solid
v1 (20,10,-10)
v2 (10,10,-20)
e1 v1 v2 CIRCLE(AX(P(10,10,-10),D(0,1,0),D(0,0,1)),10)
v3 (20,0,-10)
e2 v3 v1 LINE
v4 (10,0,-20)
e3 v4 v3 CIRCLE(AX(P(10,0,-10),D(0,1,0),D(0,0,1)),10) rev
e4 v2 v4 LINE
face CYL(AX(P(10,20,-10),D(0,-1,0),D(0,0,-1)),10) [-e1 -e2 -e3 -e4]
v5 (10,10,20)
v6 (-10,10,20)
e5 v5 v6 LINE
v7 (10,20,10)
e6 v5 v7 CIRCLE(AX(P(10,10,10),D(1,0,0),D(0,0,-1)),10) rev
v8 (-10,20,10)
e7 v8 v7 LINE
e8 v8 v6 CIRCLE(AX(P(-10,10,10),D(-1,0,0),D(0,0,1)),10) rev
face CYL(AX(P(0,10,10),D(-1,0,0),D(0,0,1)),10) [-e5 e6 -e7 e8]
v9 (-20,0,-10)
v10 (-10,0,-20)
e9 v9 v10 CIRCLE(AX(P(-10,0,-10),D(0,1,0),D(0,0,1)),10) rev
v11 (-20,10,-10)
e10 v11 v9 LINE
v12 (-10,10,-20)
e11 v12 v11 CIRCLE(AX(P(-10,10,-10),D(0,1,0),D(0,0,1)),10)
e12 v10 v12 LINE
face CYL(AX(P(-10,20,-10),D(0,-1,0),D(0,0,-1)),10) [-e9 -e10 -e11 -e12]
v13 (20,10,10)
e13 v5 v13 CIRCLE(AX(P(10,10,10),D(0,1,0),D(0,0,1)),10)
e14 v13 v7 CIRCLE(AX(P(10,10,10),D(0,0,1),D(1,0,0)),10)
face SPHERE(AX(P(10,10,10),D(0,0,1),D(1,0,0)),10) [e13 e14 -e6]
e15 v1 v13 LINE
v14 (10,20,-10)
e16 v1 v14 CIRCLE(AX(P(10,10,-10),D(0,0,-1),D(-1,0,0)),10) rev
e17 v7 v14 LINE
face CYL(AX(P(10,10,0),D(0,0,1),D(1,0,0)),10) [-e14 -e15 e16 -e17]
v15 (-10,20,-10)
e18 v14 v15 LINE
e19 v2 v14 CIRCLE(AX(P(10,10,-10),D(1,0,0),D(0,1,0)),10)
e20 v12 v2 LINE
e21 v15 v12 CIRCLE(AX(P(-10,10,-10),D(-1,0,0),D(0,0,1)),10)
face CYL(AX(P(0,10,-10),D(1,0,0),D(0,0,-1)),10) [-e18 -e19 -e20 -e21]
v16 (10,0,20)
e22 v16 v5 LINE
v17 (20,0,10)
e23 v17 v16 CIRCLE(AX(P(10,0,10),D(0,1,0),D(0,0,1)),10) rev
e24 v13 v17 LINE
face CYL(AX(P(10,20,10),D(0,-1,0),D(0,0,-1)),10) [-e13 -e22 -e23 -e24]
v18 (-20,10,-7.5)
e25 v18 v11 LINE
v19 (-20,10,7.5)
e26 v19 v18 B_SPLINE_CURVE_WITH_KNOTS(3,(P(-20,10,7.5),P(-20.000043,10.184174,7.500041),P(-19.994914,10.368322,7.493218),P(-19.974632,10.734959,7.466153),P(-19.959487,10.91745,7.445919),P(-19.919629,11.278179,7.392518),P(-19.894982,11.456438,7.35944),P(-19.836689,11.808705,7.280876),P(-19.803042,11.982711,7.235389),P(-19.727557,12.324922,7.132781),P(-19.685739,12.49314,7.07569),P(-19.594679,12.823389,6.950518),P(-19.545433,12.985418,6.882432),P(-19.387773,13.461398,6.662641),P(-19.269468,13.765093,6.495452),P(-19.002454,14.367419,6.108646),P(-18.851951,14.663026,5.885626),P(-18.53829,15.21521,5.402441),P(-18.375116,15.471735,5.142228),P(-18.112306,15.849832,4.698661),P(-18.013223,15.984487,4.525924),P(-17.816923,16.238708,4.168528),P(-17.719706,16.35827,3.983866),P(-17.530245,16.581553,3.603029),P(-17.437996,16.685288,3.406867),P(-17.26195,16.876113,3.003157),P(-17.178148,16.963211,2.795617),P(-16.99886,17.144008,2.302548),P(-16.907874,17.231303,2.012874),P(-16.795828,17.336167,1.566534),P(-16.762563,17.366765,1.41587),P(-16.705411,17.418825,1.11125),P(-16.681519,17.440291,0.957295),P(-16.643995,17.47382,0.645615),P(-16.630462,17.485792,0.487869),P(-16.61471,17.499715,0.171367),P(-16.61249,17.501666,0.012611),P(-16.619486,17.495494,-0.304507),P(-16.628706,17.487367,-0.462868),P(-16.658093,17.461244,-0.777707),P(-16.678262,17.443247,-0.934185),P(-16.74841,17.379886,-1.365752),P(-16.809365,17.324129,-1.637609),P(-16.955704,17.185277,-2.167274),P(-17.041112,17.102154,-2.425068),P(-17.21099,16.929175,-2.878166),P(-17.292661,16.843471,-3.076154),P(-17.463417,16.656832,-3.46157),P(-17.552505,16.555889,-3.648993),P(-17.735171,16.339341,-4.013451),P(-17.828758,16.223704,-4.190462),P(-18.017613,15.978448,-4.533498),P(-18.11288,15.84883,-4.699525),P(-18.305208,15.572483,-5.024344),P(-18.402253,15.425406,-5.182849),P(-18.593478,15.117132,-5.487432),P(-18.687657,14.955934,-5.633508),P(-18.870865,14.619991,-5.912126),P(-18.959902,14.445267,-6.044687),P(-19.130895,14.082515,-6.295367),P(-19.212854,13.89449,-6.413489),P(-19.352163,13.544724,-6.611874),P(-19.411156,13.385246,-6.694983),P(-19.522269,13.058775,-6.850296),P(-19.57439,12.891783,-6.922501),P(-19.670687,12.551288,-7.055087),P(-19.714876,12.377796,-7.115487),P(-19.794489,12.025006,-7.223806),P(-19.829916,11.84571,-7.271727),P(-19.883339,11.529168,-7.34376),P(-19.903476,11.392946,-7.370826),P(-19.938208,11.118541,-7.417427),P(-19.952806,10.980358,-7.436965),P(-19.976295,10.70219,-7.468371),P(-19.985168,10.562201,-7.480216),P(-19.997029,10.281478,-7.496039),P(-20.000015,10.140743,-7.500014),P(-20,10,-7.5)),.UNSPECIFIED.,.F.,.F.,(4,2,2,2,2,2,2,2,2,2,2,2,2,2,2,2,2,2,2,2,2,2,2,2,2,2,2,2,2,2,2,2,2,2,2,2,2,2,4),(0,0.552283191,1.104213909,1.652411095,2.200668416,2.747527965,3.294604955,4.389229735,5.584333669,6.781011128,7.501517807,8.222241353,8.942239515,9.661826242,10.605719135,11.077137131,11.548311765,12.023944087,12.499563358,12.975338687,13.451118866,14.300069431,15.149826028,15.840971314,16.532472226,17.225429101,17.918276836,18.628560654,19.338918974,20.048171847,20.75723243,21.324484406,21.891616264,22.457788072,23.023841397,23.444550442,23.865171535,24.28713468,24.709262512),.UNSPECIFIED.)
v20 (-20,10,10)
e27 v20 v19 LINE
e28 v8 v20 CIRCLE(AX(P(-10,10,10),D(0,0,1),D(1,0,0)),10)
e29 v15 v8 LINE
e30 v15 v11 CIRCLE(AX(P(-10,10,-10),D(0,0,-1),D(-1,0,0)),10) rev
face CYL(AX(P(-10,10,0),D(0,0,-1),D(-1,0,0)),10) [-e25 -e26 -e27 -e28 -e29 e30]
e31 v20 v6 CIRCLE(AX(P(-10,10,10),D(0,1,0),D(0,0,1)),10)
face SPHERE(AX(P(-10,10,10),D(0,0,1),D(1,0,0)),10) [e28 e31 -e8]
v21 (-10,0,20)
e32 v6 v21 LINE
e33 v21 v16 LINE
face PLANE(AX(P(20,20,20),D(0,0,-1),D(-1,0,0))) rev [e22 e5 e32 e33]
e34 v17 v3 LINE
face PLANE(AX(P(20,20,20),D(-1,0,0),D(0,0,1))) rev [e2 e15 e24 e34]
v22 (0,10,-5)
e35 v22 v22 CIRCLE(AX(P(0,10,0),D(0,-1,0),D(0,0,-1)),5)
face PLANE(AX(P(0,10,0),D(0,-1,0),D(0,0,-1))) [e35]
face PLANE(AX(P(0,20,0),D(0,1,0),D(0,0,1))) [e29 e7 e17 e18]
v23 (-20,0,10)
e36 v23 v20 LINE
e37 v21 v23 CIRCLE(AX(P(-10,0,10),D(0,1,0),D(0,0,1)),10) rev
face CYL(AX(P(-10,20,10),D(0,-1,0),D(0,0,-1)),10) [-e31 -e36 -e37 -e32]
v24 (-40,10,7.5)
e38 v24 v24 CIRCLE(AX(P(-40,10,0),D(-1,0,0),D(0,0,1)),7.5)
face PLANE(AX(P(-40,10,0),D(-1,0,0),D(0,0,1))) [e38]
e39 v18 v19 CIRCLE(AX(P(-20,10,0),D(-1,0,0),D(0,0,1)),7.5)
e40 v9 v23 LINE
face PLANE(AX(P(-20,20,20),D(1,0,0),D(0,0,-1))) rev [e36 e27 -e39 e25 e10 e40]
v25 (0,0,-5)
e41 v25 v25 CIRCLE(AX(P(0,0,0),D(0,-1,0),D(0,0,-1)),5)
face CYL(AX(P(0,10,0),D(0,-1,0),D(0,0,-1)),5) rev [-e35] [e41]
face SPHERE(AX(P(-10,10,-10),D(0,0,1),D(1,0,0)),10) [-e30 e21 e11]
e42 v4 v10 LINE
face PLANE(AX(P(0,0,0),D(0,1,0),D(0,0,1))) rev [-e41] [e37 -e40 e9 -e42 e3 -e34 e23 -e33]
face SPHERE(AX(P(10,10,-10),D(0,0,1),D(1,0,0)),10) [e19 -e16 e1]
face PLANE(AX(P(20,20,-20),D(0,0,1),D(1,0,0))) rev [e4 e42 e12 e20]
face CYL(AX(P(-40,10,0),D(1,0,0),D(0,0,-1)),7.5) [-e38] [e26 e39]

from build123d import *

# Parameters (mm, degrees)
SKETCH1_W           = 40
SKETCH1_H           = 40
BOSS_EXTRUDE1_DEPTH = 20
SKETCH2_R           = 5
CUT_EXTRUDE1_DEPTH  = 10
SKETCH3_R           = 7.5
BOSS_EXTRUDE2_DEPTH = 20
FILLET1_R           = 10


with BuildPart() as part:
    # Sketch1 → Boss-Extrude1 (new body)
    with BuildSketch(Plane(origin=(0, 0, 0), x_dir=(1, 0, 0), z_dir=(0, 1, 0))):
        Rectangle(SKETCH1_W, SKETCH1_H)
    extrude(amount=BOSS_EXTRUDE1_DEPTH)

    # Sketch2 → Cut-Extrude1 (cut)
    with BuildSketch(Plane.XZ):
        with Locations(Location((0, 0, 0), (0, 0, 270))):
            Circle(SKETCH2_R)
    extrude(amount=-CUT_EXTRUDE1_DEPTH, mode=Mode.SUBTRACT)

    # Sketch3 → Boss-Extrude2 (add)
    with BuildSketch(Plane.ZY.offset(20)):
        with Locations((0, 10)):
            Circle(SKETCH3_R)
    extrude(amount=BOSS_EXTRUDE2_DEPTH)

    # Fillet1
    # the kernel refuses this fillet: 10 mm, written as the material it takes off along each edge
    with BuildSketch(Plane(origin=(10, 10, -10), x_dir=(0, 1, 0), z_dir=(1, 0, 0))) as fillet1_piece_1_section:
        Polygon((0, 0), (FILLET1_R, 0), (FILLET1_R, -FILLET1_R), (0, -FILLET1_R), align=None)
    fillet1_piece_1 = extrude(amount=FILLET1_R, mode=Mode.PRIVATE)
    fillet1_piece_1 = fillet1_piece_1 - Plane(origin=(10, 10, -10), x_dir=(0, -0.7071067811865475, 0.7071067811865475), z_dir=(1, 0, 0)) * Sphere(FILLET1_R, mode=Mode.PRIVATE)
    add(fillet1_piece_1, mode=Mode.SUBTRACT)
    with BuildSketch(Plane(origin=(10, 10, 10), x_dir=(1, 0, 0), z_dir=(0, 0, 1))) as fillet1_piece_2_section:
        Polygon((0, 0), (FILLET1_R, 0), (FILLET1_R, FILLET1_R), (0, FILLET1_R), align=None)
    fillet1_piece_2 = extrude(amount=FILLET1_R, mode=Mode.PRIVATE)
    fillet1_piece_2 = fillet1_piece_2 - Plane(origin=(10, 10, 10), x_dir=(-0.7071067811865475, -0.7071067811865475, 0), z_dir=(0, 0, 1)) * Sphere(FILLET1_R, mode=Mode.PRIVATE)
    add(fillet1_piece_2, mode=Mode.SUBTRACT)
    with BuildSketch(Plane(origin=(-10, 10, -10), x_dir=(0, 1, 0), z_dir=(-1, 0, 0))) as fillet1_piece_3_section:
        Polygon((0, 0), (FILLET1_R, 0), (FILLET1_R, FILLET1_R), (0, FILLET1_R), align=None)
    fillet1_piece_3 = extrude(amount=FILLET1_R, mode=Mode.PRIVATE)
    fillet1_piece_3 = fillet1_piece_3 - Plane(origin=(-10, 10, -10), x_dir=(0, -0.7071067811865475, 0.7071067811865475), z_dir=(-1, 0, 0)) * Sphere(FILLET1_R, mode=Mode.PRIVATE)
    add(fillet1_piece_3, mode=Mode.SUBTRACT)
    with BuildSketch(Plane(origin=(-10, 10, 10), x_dir=(-1, 0, 0), z_dir=(0, 0, 1))) as fillet1_piece_4_section:
        Polygon((0, 0), (FILLET1_R, 0), (FILLET1_R, -FILLET1_R), (0, -FILLET1_R), align=None)
    fillet1_piece_4 = extrude(amount=FILLET1_R, mode=Mode.PRIVATE)
    fillet1_piece_4 = fillet1_piece_4 - Plane(origin=(-10, 10, 10), x_dir=(0.7071067811865475, -0.7071067811865475, 0), z_dir=(0, 0, 1)) * Sphere(FILLET1_R, mode=Mode.PRIVATE)
    add(fillet1_piece_4, mode=Mode.SUBTRACT)
    with BuildSketch(Plane(origin=(20, 20, -10), x_dir=(0, -1, 0), z_dir=(0, 0, 1)), Plane(origin=(10, 20, 20), x_dir=(0, -1, 0), z_dir=(-1, 0, 0))) as fillet1_piece_5:
        with BuildLine():
            CenterArc((FILLET1_R, -FILLET1_R), FILLET1_R, 90, 90)
            Line((0, -FILLET1_R), (0, 0))
            Line((0, 0), (FILLET1_R, 0))
        make_face()
    extrude(amount=20, mode=Mode.SUBTRACT)
    with BuildSketch(Plane(origin=(-10, 20, -20), x_dir=(0, 0, 1), z_dir=(1, 0, 0))) as fillet1_piece_6:
        with BuildLine():
            CenterArc((FILLET1_R, FILLET1_R), FILLET1_R, 180, 90)
            Line((0, FILLET1_R), (0, 0))
            Line((0, 0), (FILLET1_R, 0))
        make_face()
    extrude(amount=20, mode=Mode.SUBTRACT)
    with BuildSketch(Plane(origin=(-20, 20, 10), x_dir=(0, -1, 0), z_dir=(0, 0, -1))) as fillet1_piece_7_section:
        with BuildLine():
            CenterArc((FILLET1_R, -FILLET1_R), FILLET1_R, 90, 90)
            Line((0, -FILLET1_R), (0, 0))
            Line((0, 0), (FILLET1_R, 0))
        make_face()
    fillet1_piece_7 = extrude(amount=20, mode=Mode.PRIVATE)
    fillet1_piece_7 = fillet1_piece_7 - Plane(origin=(-17.405135358, 10, 0), x_dir=(0, 0, 1), z_dir=(1, 0, 0)) * Cylinder(7.5, 80, mode=Mode.PRIVATE)
    add(fillet1_piece_7, mode=Mode.SUBTRACT)
    with BuildSketch(Plane(origin=(-20, -25, -20), x_dir=(0, 0, 1), z_dir=(0, 1, 0)), Plane(origin=(-20, -25, 20), x_dir=(1, 0, 0), z_dir=(0, 1, 0))) as fillet1_piece_8:
        with BuildLine():
            CenterArc((FILLET1_R, FILLET1_R), FILLET1_R, 180, 90)
            Line((0, FILLET1_R), (0, 0))
            Line((0, 0), (FILLET1_R, 0))
        make_face()
    extrude(amount=35, mode=Mode.SUBTRACT)
    with BuildSketch(Plane(origin=(20, -25, -20), x_dir=(0, 0, 1), z_dir=(0, 1, 0)), Plane(origin=(20, -25, 20), x_dir=(-1, 0, 0), z_dir=(0, 1, 0))) as fillet1_piece_9:
        with BuildLine():
            CenterArc((FILLET1_R, -FILLET1_R), FILLET1_R, 90, 90)
            Line((0, -FILLET1_R), (0, 0))
            Line((0, 0), (FILLET1_R, 0))
        make_face()
    extrude(amount=35, mode=Mode.SUBTRACT)


solid = part.part
